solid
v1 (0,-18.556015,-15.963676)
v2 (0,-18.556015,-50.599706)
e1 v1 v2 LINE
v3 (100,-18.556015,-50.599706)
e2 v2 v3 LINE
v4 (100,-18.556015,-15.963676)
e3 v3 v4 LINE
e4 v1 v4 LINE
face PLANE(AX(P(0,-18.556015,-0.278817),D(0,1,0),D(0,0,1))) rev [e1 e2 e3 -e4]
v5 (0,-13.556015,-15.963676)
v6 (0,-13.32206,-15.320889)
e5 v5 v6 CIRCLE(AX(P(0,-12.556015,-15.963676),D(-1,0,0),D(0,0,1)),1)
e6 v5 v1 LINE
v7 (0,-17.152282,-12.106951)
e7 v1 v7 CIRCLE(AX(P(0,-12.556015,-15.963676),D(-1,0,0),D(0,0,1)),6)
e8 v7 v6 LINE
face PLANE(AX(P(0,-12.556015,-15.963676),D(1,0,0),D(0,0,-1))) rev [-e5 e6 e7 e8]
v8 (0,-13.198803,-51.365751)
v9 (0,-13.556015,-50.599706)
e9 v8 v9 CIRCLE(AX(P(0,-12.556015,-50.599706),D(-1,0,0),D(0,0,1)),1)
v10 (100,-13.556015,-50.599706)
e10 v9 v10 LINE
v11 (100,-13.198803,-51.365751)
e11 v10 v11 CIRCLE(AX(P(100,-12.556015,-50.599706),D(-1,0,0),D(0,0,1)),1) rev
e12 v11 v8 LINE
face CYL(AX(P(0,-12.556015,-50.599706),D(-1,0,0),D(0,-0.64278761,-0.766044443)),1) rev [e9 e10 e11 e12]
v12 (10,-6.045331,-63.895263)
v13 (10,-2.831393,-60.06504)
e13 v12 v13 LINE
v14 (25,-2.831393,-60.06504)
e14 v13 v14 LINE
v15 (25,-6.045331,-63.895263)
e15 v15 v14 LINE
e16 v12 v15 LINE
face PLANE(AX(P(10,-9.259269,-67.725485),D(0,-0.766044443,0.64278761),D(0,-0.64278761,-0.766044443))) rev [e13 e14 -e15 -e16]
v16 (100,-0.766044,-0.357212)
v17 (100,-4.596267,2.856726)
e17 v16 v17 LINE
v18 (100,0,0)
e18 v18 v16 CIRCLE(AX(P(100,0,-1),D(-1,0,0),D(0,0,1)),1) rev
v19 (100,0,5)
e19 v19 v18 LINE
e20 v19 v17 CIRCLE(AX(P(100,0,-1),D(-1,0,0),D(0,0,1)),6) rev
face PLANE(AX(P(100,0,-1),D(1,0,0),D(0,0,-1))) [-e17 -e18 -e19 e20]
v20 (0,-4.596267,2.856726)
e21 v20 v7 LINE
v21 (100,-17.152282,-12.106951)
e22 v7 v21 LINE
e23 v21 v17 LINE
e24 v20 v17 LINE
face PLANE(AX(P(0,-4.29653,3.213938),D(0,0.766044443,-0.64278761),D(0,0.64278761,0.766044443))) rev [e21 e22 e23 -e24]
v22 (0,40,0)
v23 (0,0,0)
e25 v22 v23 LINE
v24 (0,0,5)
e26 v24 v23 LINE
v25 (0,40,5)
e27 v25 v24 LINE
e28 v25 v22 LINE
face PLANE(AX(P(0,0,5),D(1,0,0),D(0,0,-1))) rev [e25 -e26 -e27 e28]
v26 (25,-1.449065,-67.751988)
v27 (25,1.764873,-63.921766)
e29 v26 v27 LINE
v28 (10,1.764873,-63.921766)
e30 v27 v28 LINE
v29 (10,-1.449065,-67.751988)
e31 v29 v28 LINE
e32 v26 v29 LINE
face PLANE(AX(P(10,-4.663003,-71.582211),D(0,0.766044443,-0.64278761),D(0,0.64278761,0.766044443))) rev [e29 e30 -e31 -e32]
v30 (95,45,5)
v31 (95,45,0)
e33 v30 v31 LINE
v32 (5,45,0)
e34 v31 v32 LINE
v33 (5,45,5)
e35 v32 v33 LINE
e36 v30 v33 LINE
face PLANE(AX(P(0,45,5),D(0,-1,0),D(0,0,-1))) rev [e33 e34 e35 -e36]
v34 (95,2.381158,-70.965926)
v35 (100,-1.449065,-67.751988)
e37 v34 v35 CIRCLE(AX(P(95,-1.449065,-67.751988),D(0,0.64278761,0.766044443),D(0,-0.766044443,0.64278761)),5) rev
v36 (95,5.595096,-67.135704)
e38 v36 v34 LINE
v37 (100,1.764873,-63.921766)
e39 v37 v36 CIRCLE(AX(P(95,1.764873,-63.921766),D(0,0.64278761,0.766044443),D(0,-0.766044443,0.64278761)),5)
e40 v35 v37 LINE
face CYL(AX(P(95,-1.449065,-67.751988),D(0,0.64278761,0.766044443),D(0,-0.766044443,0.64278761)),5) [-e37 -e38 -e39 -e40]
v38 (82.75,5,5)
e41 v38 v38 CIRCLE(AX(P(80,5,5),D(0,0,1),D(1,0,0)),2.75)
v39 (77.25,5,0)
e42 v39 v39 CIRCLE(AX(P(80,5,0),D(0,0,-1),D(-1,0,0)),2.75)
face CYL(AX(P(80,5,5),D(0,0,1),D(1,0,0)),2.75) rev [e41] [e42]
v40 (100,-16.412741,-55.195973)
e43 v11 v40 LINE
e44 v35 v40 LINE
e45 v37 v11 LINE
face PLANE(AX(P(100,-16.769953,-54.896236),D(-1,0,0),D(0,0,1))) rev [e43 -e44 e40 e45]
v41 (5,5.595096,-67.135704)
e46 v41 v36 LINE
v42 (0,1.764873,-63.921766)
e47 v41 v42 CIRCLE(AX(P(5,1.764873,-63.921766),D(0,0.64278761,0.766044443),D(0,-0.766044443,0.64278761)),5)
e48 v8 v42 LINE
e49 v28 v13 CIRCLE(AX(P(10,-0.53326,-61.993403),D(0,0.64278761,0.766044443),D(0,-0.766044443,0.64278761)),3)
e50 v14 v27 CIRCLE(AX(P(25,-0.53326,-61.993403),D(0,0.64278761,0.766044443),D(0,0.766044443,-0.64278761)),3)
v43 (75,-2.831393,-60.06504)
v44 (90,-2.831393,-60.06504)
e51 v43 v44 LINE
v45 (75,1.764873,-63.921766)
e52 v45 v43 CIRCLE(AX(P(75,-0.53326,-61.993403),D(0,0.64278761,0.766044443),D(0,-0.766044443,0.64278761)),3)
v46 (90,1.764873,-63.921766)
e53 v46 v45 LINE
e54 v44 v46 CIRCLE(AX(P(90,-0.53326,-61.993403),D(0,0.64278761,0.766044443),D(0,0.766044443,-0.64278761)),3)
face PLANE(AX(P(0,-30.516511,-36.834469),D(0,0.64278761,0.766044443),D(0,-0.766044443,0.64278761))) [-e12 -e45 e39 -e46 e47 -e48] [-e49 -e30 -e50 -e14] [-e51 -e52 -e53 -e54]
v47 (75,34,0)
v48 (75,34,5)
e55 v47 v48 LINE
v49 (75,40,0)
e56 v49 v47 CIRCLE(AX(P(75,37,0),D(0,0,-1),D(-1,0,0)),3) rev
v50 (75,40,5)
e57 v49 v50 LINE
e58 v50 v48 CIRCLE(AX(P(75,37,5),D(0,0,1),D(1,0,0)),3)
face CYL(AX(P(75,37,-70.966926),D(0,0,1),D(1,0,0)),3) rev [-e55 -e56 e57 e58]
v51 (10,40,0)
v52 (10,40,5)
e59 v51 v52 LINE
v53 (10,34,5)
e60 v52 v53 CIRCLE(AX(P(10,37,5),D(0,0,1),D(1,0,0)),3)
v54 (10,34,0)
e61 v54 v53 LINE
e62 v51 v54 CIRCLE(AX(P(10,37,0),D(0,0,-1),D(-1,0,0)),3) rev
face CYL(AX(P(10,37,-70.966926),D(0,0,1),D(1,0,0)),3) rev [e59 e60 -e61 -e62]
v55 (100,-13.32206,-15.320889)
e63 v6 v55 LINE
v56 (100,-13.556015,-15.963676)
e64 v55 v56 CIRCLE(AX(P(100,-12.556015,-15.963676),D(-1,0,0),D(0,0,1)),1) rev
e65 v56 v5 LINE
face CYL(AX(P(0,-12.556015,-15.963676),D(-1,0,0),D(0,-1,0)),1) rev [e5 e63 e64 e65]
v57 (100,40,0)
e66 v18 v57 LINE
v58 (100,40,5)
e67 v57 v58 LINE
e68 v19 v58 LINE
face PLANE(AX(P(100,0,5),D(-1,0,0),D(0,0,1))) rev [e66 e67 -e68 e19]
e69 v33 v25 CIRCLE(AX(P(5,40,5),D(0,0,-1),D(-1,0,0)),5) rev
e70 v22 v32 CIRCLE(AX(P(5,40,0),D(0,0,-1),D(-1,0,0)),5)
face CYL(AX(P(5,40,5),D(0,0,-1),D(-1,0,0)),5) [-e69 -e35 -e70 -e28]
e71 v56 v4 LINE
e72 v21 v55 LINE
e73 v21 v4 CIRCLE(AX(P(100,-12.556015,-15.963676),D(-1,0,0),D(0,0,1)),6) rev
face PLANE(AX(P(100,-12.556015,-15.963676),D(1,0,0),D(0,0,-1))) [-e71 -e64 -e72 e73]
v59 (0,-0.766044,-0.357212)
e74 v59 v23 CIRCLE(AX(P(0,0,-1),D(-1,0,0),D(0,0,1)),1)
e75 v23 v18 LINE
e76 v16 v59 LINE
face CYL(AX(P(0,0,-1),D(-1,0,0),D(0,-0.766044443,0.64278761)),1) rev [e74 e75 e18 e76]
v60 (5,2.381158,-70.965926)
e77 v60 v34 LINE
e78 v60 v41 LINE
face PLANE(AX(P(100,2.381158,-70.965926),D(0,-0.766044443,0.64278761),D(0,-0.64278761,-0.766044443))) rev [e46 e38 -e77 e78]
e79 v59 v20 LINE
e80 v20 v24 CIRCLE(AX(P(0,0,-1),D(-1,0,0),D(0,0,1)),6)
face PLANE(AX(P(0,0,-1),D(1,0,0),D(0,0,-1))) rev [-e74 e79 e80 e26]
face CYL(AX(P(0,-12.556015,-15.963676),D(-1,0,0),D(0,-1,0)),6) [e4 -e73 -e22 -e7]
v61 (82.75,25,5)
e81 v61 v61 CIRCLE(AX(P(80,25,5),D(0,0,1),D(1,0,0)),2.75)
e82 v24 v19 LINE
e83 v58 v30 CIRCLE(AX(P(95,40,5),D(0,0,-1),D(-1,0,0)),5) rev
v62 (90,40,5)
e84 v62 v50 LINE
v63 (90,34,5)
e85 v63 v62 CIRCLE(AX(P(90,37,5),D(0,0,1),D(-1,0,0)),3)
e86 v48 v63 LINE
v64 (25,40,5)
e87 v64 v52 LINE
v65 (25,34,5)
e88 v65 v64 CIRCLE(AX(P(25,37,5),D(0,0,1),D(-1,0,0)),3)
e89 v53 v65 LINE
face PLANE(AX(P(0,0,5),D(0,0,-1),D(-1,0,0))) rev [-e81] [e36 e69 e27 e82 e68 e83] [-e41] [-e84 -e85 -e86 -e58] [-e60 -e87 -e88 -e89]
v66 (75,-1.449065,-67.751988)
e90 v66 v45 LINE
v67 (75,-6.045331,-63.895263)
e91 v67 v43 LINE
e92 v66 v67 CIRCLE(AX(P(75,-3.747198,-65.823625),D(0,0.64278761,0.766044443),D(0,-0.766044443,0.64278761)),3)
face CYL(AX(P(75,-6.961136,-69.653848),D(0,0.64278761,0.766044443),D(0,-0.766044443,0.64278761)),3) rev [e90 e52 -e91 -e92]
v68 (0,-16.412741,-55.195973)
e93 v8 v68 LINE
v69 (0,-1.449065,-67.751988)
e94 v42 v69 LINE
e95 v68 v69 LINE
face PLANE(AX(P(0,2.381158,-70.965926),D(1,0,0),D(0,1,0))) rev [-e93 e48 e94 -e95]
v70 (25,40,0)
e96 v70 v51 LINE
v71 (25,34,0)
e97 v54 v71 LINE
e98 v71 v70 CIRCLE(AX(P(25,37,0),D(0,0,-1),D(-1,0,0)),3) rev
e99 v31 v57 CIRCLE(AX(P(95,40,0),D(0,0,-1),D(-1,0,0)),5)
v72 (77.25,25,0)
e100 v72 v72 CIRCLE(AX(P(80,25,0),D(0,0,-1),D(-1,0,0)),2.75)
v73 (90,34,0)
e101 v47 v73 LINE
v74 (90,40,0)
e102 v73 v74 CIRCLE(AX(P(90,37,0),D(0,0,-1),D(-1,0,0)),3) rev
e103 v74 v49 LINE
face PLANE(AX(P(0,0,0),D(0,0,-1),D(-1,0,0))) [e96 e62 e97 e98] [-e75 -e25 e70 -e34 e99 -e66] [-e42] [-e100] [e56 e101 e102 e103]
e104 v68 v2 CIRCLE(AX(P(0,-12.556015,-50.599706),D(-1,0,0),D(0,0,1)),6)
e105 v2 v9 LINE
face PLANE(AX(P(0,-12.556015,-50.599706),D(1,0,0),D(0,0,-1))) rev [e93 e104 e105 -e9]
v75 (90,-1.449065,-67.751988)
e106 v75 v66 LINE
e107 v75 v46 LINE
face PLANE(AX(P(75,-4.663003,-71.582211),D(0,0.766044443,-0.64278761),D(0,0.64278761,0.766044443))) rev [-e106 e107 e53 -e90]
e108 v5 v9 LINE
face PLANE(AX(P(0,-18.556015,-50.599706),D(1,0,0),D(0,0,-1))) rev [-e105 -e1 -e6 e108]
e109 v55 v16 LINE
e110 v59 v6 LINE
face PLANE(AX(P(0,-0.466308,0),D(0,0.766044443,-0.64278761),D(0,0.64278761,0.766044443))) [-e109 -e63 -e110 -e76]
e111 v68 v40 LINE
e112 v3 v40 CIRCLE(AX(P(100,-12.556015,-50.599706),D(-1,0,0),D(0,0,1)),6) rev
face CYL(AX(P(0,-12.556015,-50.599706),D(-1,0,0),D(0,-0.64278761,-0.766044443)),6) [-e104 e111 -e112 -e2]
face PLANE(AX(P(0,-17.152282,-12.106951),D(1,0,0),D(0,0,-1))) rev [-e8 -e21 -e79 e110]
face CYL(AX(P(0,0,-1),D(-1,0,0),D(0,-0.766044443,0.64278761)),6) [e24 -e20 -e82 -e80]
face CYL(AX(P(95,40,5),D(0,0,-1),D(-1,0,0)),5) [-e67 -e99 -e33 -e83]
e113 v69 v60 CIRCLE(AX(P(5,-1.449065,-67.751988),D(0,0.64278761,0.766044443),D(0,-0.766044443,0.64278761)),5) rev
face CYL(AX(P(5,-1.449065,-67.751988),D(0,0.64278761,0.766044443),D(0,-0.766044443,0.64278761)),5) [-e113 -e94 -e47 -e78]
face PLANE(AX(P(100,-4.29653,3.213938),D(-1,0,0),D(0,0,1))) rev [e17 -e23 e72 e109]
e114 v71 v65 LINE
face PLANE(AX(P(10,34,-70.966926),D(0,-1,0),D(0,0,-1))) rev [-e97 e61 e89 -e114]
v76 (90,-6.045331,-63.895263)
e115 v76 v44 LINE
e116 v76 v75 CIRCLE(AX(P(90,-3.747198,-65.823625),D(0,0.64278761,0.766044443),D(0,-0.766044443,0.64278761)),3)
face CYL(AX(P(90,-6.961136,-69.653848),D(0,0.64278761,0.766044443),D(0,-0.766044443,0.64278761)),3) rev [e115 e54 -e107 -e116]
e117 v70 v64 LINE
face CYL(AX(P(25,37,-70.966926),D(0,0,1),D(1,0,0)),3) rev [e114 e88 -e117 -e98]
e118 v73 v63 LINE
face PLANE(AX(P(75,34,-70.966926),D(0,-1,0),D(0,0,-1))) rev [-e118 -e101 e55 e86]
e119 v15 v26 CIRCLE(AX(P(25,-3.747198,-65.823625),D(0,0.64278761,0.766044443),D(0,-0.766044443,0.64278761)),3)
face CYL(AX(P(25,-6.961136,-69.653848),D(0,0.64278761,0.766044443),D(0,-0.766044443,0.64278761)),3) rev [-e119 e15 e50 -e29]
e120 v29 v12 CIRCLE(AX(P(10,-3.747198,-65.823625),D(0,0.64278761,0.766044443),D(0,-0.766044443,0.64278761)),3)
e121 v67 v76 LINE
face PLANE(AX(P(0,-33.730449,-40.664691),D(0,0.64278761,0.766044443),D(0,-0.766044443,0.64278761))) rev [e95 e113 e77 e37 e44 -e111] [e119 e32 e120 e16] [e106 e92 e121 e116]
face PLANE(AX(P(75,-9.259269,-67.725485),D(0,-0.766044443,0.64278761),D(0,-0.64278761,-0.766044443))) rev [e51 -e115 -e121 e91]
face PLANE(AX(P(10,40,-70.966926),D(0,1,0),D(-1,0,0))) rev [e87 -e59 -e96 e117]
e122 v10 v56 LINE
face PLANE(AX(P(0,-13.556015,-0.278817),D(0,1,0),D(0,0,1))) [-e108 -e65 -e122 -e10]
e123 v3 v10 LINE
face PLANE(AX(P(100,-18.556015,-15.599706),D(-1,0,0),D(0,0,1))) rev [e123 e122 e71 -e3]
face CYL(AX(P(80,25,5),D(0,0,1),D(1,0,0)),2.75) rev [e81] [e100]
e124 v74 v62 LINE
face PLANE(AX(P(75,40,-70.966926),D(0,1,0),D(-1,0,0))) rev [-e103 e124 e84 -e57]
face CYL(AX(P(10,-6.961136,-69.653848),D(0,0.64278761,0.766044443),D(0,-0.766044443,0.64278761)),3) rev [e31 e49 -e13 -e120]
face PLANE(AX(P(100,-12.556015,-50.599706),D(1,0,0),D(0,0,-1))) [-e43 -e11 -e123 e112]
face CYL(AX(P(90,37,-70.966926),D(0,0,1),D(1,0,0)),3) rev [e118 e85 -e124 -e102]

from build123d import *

# Parameters (mm, degrees)
SKETCH1_W                = 100
SKETCH1_H                = 45
BASE_FLANGE1_DEPTH       = 5
EDGE_FLANGE1_DEPTH       = 100
EDGE_FLANGE2_DEPTH       = 100
EDGE_FLANGE3_DEPTH       = 100
CUT_EXTRUDE1_REACH       = 135.401
SKETCH15_R               = 2.5
CUT_EXTRUDE2_DEPTH       = 10
M5_CLEARANCE_HOLE1_D     = 5.5
M5_CLEARANCE_HOLE1_DEPTH = 15.966
M5_CLEARANCE_HOLE1_TIP   = 1.652366702
BREAK_CORNER1_START      = -52.832474919
BREAK_CORNER1_DEPTH      = 5
BREAK_CORNER1_2_DEPTH    = 5


# Read off the part's stored shape, not the designer's step: Break-Corner1
# Sheet-metal steps are written as plain solids
with BuildPart() as part:
    # Sketch1 → Base-Flange1 (new body)
    with BuildSketch(Plane.XY):
        with Locations((50, 22.5)):
            Rectangle(SKETCH1_W, SKETCH1_H)
    extrude(amount=BASE_FLANGE1_DEPTH)

    # Edge-Flange1 section (across the edge) → Edge-Flange1 (add)
    with BuildSketch(Plane(origin=(100, -0.466307658, 0), x_dir=(0, 0.7660444431189746, -0.6427876096865435), z_dir=(-1, 0, 0))):
        with BuildLine():
            Line((-5, 0.466307658), (-5, 20))
            Line((-5, 20), (0, 20))
            Line((0, 20), (0, 0.466307658))
            ThreePointArc((0, 0.466307658), (0.093692213, 0.043689396), (0.35721239, -0.299736785))
            Line((0.35721239, -0.299736785), (-2.856725658, -4.129959001))
            ThreePointArc((-2.856725658, -4.129959001), (-4.437846722, -2.069401912), (-5, 0.466307658))
        make_face()
    extrude(amount=EDGE_FLANGE1_DEPTH)

    # Edge-Flange2 section (across the edge) → Edge-Flange2 (add)
    with BuildSketch(Plane(origin=(100, -13.556015409, -15.599706238), x_dir=(0, 1, 0), z_dir=(-1, 0, 0))):
        with BuildLine():
            Line((-5, 0.363970234), (-5, 35))
            Line((-5, 35), (0, 35))
            Line((0, 35), (0, 0.363970234))
            ThreePointArc((0, 0.363970234), (0.060307379, 0.021950091), (0.233955557, -0.278817375))
            Line((0.233955557, -0.278817375), (-3.596266659, -3.492755424))
            ThreePointArc((-3.596266659, -3.492755424), (-4.638155725, -1.688150626), (-5, 0.363970234))
        make_face()
    extrude(amount=EDGE_FLANGE2_DEPTH)

    # Edge-Flange3 section (across the edge) → Edge-Flange3 (add)
    with BuildSketch(Plane(origin=(100, -13.556015409, -51.066013896), x_dir=(0, 0.6427876096865516, 0.7660444431189678), z_dir=(-1, 0, 0))):
        with BuildLine():
            Line((-5, 0.466307658), (-5, 25))
            Line((-5, 25), (0, 25))
            Line((0, 25), (0, 0.466307658))
            ThreePointArc((0, 0.466307658), (0.093692213, 0.043689396), (0.35721239, -0.299736785))
            Line((0.35721239, -0.299736785), (-2.856725658, -4.129959001))
            ThreePointArc((-2.856725658, -4.129959001), (-4.437846722, -2.069401912), (-5, 0.466307658))
        make_face()
    extrude(amount=EDGE_FLANGE3_DEPTH)

    # Sketch15 → Cut-Extrude1 (cut, up to next)
    with BuildSketch(Plane.XY.offset(5), mode=Mode.PRIVATE) as cut_extrude1_sk1:
        with Locations((80, 5)):
            Circle(SKETCH15_R)
    cut_extrude1_tool1 = extrude(cut_extrude1_sk1.sketch, amount=-CUT_EXTRUDE1_REACH, mode=Mode.PRIVATE) & part.part
    # Sketch15 → Cut-Extrude1 (cut, up to next)
    with BuildSketch(Plane.XY.offset(5), mode=Mode.PRIVATE) as cut_extrude1_sk2:
        with Locations((80, 25)):
            Circle(SKETCH15_R)
    cut_extrude1_tool2 = extrude(cut_extrude1_sk2.sketch, amount=-CUT_EXTRUDE1_REACH, mode=Mode.PRIVATE) & part.part
    # Sketch15 → Cut-Extrude1 (cut, up to next)
    with BuildSketch(Plane.XY.offset(5), mode=Mode.PRIVATE) as cut_extrude1_sk3:
        with BuildLine():
            Line((10, 40), (25, 40))
            ThreePointArc((25, 40), (28, 37), (25, 34))
            Line((25, 34), (10, 34))
            ThreePointArc((10, 34), (7, 37), (10, 40))
        make_face()
    cut_extrude1_tool3 = extrude(cut_extrude1_sk3.sketch, amount=-CUT_EXTRUDE1_REACH, mode=Mode.PRIVATE) & part.part
    # Sketch15 → Cut-Extrude1 (cut, up to next)
    with BuildSketch(Plane.XY.offset(5), mode=Mode.PRIVATE) as cut_extrude1_sk4:
        with BuildLine():
            Line((75, 40), (90, 40))
            ThreePointArc((90, 40), (93, 37), (90, 34))
            Line((90, 34), (75, 34))
            ThreePointArc((75, 34), (72, 37), (75, 40))
        make_face()
    cut_extrude1_tool4 = extrude(cut_extrude1_sk4.sketch, amount=-CUT_EXTRUDE1_REACH, mode=Mode.PRIVATE) & part.part
    add(cut_extrude1_tool1.solids().sort_by_distance((80, 5, 5))[0], mode=Mode.SUBTRACT)
    add(cut_extrude1_tool2.solids().sort_by_distance((80, 25, 5))[0], mode=Mode.SUBTRACT)
    add(cut_extrude1_tool3.solids().sort_by_distance((17.5, 37, 5))[0], mode=Mode.SUBTRACT)
    add(cut_extrude1_tool4.solids().sort_by_distance((82.5, 37, 5))[0], mode=Mode.SUBTRACT)

    # Sketch16 → Cut-Extrude2 (cut)
    with BuildSketch(Plane(origin=(0, -30.746122218, -36.641801612), x_dir=(1, 0, 0), z_dir=(0, 0.6427876096865515, 0.7660444431189678))):
        with BuildLine():
            Line((10, 42.440090734), (25, 42.440090734))
            ThreePointArc((25, 42.440090734), (28, 39.440090734), (25, 36.440090734))
            Line((25, 36.440090734), (10, 36.440090734))
            ThreePointArc((10, 36.440090734), (7, 39.440090734), (10, 42.440090734))
        make_face()
        with BuildLine():
            Line((75, 42.440090734), (90, 42.440090734))
            ThreePointArc((90, 42.440090734), (93, 39.440090734), (90, 36.440090734))
            Line((90, 36.440090734), (75, 36.440090734))
            ThreePointArc((75, 36.440090734), (72, 39.440090734), (75, 42.440090734))
        make_face()
    extrude(amount=-CUT_EXTRUDE2_DEPTH, mode=Mode.SUBTRACT)

    # M5 Clearance Hole1
    with Locations(Plane.XY.offset(5)):
        with Locations((80, 25), (80, 5)):
            Hole(M5_CLEARANCE_HOLE1_D / 2, depth=M5_CLEARANCE_HOLE1_DEPTH)
            with Locations((0, 0, -(M5_CLEARANCE_HOLE1_DEPTH + M5_CLEARANCE_HOLE1_TIP / 2))):  # 118° drill point
                Cone(0, M5_CLEARANCE_HOLE1_D / 2, M5_CLEARANCE_HOLE1_TIP, mode=Mode.SUBTRACT)

    # Break-Corner1 outline → Break-Corner1 (cut)
    with BuildSketch(Plane(origin=(0, 0, 0), x_dir=(1, 0, 0), z_dir=(0, 0.6427876096865517, 0.7660444431189677)).offset(BREAK_CORNER1_START)):
        with BuildLine():
            ThreePointArc((0, 42.440090734), (1.464466094, 45.97562464), (5, 47.440090734))
            Line((5, 47.440090734), (0, 47.440090734))
            Line((0, 47.440090734), (0, 42.440090734))
        make_face()
        with BuildLine():
            ThreePointArc((95, 47.440090734), (98.535533906, 45.97562464), (100, 42.440090734))
            Line((100, 42.440090734), (100, 47.440090734))
            Line((100, 47.440090734), (95, 47.440090734))
        make_face()
    extrude(amount=BREAK_CORNER1_DEPTH, mode=Mode.SUBTRACT)

    # Break-Corner1 2 outline → Break-Corner1 2 (cut)
    with BuildSketch(Plane.XY):
        with BuildLine():
            Line((0, 45), (0, 40))
            ThreePointArc((0, 40), (1.464466094, 43.535533906), (5, 45))
            Line((5, 45), (0, 45))
        make_face()
        with BuildLine():
            Line((100, 45), (95, 45))
            ThreePointArc((95, 45), (98.535533906, 43.535533906), (100, 40))
            Line((100, 40), (100, 45))
        make_face()
    extrude(amount=BREAK_CORNER1_2_DEPTH, mode=Mode.SUBTRACT)


solid = part.part
